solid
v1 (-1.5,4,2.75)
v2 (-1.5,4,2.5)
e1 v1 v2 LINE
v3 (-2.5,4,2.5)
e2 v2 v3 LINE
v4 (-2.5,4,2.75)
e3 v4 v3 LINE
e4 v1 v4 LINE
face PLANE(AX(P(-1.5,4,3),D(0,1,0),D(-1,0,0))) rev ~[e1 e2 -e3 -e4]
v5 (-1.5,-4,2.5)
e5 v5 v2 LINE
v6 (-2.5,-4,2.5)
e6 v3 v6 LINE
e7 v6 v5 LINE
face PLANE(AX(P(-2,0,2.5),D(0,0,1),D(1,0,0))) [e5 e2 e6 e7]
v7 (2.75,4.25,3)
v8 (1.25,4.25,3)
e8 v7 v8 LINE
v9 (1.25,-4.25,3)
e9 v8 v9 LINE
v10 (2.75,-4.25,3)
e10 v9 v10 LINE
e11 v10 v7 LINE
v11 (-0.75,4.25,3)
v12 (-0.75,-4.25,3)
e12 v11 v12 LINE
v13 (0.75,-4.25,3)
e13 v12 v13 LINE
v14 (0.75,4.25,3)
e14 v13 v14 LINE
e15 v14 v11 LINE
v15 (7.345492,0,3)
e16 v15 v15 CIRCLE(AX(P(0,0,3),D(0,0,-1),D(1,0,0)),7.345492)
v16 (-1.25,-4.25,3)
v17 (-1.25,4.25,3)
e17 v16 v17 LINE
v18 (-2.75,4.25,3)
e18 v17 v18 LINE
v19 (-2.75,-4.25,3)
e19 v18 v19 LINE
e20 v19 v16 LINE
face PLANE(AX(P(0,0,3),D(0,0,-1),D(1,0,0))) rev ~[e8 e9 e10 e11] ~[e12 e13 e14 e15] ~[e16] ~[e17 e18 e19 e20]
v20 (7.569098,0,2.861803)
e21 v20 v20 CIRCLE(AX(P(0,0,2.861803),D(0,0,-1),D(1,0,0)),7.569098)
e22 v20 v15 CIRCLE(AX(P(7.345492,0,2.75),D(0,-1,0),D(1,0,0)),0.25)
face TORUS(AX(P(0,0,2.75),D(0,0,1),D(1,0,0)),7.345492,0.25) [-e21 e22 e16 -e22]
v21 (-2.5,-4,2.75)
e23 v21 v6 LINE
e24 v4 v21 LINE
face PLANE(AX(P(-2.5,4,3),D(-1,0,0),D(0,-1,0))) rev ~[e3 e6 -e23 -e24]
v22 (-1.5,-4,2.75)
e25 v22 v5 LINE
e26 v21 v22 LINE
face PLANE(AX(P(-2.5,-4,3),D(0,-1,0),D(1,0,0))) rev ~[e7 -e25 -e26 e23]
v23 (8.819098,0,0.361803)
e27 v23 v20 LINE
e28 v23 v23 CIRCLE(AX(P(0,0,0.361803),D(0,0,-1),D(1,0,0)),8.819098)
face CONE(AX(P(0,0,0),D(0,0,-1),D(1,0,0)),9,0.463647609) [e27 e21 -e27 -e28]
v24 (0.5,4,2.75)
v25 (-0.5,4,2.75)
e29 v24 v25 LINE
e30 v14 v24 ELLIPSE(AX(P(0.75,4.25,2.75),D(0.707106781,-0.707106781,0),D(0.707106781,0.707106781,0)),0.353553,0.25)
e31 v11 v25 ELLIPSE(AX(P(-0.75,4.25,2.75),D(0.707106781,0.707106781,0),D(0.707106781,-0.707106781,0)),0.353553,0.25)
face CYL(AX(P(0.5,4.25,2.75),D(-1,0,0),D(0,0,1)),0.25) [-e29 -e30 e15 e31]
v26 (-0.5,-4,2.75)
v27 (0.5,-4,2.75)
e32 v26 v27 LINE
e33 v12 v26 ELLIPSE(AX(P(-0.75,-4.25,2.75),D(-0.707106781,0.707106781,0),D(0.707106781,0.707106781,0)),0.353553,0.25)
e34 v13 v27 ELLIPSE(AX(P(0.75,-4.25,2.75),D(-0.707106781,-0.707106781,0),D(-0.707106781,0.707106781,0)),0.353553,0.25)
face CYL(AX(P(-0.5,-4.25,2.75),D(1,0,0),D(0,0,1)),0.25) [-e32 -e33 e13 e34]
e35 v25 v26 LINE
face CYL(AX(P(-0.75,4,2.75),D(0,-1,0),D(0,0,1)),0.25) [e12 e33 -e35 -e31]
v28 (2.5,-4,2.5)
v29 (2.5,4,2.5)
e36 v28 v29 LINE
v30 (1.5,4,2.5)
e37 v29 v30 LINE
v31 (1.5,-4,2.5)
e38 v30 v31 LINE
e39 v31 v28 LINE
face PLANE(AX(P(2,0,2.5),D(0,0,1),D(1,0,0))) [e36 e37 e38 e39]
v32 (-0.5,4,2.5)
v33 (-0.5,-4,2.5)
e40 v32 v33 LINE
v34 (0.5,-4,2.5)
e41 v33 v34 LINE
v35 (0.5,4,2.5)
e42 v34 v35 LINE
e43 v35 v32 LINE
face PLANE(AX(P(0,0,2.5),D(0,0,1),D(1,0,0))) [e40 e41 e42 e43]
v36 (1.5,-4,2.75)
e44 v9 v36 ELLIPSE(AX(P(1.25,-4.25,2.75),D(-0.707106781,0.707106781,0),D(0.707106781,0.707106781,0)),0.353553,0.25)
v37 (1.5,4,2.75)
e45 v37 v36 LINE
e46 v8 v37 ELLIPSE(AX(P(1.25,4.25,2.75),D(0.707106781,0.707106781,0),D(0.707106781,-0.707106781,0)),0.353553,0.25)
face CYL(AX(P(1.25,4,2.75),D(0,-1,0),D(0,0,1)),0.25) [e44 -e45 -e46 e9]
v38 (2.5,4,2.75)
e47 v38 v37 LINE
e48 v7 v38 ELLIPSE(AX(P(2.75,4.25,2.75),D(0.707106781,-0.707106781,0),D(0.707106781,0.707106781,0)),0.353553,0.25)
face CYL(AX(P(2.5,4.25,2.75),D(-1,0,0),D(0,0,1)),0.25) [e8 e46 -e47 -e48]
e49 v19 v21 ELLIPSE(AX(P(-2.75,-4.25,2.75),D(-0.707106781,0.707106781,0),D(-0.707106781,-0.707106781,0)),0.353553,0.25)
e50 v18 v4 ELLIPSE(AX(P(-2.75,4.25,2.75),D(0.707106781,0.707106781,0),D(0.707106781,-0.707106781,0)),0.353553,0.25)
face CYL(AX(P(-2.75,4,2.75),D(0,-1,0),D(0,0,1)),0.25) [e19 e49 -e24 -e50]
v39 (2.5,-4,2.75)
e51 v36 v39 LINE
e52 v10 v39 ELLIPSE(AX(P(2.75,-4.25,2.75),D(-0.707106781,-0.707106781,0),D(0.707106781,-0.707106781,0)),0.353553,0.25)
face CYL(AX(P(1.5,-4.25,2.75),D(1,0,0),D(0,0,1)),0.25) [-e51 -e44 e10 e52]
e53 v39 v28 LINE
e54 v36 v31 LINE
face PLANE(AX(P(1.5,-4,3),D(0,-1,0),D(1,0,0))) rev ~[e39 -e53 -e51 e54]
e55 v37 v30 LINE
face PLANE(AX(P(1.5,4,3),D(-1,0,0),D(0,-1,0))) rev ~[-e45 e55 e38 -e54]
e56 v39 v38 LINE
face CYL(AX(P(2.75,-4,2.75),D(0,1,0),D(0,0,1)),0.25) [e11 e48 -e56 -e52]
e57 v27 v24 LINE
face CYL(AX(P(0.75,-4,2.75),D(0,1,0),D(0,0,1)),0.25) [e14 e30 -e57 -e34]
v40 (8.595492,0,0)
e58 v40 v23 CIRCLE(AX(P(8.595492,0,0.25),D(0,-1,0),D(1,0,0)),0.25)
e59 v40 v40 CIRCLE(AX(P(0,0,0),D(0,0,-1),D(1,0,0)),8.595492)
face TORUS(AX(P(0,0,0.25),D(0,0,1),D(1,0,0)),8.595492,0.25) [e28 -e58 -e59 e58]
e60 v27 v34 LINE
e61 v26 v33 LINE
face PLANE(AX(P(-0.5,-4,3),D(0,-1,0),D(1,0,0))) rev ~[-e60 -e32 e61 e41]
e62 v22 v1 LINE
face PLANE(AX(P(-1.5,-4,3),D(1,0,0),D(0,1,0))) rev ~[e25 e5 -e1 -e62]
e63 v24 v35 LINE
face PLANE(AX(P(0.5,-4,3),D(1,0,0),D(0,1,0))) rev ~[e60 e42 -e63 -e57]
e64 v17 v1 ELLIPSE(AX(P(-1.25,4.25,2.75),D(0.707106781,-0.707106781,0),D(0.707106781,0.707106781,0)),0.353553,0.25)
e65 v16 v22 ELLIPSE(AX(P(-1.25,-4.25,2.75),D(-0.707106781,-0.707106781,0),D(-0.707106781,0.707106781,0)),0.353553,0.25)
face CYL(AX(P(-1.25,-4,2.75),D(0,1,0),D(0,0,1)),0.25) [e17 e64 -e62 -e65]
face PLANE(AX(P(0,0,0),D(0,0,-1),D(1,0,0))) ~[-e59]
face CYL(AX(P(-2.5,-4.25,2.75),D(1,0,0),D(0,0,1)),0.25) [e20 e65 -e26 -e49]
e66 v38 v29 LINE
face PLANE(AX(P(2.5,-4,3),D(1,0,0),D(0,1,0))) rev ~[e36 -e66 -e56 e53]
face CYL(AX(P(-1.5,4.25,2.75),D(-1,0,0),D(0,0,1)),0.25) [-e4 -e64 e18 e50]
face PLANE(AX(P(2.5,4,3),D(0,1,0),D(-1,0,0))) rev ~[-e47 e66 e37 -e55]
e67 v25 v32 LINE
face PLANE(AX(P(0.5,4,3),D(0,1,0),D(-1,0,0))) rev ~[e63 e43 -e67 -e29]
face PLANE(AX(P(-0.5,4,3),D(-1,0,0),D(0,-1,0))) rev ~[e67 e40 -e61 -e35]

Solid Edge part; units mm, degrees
sketch "Sketch1" plane through (0, 0, 0) normal (0, -1, 0) x (1, 0, 0)
  line L0 (0, 0) -> (9, 0)
  line L1 (9, 0) -> (7.5, 3)
  line L2 (7.5, 3) -> (0, 3)
  dimension "D1" = 9
  dimension "D2" = 3
  dimension "D3" = 7.5
revolve "RevolvedProtrusion1" add sketch "Sketch1" angle 360 about axis through (0, 0, 3) along (0, 0, -1)
sketch "Sketch2" plane through (0, 0, 3) normal (0, 0, 1) x (1, 0, 0)
  line L0 (-0.5, -4) -> (0.5, -4)
  line L1 (0.5, -4) -> (0.5, 4)
  line L2 (0.5, 4) -> (-0.5, 4)
  line L3 (-0.5, 4) -> (-0.5, -4)
  line L4 (1.5, -4) -> (2.5, -4)
  line L5 (2.5, -4) -> (2.5, 4)
  line L6 (2.5, 4) -> (1.5, 4)
  line L7 (1.5, 4) -> (1.5, -4)
  line L8 (-2.5, -4) -> (-1.5, -4)
  line L9 (-1.5, -4) -> (-1.5, 4)
  line L10 (-1.5, 4) -> (-2.5, 4)
  line L11 (-2.5, 4) -> (-2.5, -4)
  dimension "D1" = 1
  dimension "D2" = 8
  dimension "D3" = 2
  dimension "D4" = 2
extrude "Cutout1" cut sketch "Sketch2" against normal blind 0.5
fillet "main_rounds" radius 0.25 14 edges at (-9, 0, 0) (-7.5, 0, 3) (0.5, 0, 3) (0, -4, 3) (-0.5, 0, 3) (0, 4, 3) (-2.5, 0, 3) (-1.5, 0, 3) (-2, 4, 3) (-2, -4, 3) (2, -4, 3) (1.5, 0, 3) (2.5, 0, 3) (2, 4, 3)
properties material "Polyethylene, low density"
